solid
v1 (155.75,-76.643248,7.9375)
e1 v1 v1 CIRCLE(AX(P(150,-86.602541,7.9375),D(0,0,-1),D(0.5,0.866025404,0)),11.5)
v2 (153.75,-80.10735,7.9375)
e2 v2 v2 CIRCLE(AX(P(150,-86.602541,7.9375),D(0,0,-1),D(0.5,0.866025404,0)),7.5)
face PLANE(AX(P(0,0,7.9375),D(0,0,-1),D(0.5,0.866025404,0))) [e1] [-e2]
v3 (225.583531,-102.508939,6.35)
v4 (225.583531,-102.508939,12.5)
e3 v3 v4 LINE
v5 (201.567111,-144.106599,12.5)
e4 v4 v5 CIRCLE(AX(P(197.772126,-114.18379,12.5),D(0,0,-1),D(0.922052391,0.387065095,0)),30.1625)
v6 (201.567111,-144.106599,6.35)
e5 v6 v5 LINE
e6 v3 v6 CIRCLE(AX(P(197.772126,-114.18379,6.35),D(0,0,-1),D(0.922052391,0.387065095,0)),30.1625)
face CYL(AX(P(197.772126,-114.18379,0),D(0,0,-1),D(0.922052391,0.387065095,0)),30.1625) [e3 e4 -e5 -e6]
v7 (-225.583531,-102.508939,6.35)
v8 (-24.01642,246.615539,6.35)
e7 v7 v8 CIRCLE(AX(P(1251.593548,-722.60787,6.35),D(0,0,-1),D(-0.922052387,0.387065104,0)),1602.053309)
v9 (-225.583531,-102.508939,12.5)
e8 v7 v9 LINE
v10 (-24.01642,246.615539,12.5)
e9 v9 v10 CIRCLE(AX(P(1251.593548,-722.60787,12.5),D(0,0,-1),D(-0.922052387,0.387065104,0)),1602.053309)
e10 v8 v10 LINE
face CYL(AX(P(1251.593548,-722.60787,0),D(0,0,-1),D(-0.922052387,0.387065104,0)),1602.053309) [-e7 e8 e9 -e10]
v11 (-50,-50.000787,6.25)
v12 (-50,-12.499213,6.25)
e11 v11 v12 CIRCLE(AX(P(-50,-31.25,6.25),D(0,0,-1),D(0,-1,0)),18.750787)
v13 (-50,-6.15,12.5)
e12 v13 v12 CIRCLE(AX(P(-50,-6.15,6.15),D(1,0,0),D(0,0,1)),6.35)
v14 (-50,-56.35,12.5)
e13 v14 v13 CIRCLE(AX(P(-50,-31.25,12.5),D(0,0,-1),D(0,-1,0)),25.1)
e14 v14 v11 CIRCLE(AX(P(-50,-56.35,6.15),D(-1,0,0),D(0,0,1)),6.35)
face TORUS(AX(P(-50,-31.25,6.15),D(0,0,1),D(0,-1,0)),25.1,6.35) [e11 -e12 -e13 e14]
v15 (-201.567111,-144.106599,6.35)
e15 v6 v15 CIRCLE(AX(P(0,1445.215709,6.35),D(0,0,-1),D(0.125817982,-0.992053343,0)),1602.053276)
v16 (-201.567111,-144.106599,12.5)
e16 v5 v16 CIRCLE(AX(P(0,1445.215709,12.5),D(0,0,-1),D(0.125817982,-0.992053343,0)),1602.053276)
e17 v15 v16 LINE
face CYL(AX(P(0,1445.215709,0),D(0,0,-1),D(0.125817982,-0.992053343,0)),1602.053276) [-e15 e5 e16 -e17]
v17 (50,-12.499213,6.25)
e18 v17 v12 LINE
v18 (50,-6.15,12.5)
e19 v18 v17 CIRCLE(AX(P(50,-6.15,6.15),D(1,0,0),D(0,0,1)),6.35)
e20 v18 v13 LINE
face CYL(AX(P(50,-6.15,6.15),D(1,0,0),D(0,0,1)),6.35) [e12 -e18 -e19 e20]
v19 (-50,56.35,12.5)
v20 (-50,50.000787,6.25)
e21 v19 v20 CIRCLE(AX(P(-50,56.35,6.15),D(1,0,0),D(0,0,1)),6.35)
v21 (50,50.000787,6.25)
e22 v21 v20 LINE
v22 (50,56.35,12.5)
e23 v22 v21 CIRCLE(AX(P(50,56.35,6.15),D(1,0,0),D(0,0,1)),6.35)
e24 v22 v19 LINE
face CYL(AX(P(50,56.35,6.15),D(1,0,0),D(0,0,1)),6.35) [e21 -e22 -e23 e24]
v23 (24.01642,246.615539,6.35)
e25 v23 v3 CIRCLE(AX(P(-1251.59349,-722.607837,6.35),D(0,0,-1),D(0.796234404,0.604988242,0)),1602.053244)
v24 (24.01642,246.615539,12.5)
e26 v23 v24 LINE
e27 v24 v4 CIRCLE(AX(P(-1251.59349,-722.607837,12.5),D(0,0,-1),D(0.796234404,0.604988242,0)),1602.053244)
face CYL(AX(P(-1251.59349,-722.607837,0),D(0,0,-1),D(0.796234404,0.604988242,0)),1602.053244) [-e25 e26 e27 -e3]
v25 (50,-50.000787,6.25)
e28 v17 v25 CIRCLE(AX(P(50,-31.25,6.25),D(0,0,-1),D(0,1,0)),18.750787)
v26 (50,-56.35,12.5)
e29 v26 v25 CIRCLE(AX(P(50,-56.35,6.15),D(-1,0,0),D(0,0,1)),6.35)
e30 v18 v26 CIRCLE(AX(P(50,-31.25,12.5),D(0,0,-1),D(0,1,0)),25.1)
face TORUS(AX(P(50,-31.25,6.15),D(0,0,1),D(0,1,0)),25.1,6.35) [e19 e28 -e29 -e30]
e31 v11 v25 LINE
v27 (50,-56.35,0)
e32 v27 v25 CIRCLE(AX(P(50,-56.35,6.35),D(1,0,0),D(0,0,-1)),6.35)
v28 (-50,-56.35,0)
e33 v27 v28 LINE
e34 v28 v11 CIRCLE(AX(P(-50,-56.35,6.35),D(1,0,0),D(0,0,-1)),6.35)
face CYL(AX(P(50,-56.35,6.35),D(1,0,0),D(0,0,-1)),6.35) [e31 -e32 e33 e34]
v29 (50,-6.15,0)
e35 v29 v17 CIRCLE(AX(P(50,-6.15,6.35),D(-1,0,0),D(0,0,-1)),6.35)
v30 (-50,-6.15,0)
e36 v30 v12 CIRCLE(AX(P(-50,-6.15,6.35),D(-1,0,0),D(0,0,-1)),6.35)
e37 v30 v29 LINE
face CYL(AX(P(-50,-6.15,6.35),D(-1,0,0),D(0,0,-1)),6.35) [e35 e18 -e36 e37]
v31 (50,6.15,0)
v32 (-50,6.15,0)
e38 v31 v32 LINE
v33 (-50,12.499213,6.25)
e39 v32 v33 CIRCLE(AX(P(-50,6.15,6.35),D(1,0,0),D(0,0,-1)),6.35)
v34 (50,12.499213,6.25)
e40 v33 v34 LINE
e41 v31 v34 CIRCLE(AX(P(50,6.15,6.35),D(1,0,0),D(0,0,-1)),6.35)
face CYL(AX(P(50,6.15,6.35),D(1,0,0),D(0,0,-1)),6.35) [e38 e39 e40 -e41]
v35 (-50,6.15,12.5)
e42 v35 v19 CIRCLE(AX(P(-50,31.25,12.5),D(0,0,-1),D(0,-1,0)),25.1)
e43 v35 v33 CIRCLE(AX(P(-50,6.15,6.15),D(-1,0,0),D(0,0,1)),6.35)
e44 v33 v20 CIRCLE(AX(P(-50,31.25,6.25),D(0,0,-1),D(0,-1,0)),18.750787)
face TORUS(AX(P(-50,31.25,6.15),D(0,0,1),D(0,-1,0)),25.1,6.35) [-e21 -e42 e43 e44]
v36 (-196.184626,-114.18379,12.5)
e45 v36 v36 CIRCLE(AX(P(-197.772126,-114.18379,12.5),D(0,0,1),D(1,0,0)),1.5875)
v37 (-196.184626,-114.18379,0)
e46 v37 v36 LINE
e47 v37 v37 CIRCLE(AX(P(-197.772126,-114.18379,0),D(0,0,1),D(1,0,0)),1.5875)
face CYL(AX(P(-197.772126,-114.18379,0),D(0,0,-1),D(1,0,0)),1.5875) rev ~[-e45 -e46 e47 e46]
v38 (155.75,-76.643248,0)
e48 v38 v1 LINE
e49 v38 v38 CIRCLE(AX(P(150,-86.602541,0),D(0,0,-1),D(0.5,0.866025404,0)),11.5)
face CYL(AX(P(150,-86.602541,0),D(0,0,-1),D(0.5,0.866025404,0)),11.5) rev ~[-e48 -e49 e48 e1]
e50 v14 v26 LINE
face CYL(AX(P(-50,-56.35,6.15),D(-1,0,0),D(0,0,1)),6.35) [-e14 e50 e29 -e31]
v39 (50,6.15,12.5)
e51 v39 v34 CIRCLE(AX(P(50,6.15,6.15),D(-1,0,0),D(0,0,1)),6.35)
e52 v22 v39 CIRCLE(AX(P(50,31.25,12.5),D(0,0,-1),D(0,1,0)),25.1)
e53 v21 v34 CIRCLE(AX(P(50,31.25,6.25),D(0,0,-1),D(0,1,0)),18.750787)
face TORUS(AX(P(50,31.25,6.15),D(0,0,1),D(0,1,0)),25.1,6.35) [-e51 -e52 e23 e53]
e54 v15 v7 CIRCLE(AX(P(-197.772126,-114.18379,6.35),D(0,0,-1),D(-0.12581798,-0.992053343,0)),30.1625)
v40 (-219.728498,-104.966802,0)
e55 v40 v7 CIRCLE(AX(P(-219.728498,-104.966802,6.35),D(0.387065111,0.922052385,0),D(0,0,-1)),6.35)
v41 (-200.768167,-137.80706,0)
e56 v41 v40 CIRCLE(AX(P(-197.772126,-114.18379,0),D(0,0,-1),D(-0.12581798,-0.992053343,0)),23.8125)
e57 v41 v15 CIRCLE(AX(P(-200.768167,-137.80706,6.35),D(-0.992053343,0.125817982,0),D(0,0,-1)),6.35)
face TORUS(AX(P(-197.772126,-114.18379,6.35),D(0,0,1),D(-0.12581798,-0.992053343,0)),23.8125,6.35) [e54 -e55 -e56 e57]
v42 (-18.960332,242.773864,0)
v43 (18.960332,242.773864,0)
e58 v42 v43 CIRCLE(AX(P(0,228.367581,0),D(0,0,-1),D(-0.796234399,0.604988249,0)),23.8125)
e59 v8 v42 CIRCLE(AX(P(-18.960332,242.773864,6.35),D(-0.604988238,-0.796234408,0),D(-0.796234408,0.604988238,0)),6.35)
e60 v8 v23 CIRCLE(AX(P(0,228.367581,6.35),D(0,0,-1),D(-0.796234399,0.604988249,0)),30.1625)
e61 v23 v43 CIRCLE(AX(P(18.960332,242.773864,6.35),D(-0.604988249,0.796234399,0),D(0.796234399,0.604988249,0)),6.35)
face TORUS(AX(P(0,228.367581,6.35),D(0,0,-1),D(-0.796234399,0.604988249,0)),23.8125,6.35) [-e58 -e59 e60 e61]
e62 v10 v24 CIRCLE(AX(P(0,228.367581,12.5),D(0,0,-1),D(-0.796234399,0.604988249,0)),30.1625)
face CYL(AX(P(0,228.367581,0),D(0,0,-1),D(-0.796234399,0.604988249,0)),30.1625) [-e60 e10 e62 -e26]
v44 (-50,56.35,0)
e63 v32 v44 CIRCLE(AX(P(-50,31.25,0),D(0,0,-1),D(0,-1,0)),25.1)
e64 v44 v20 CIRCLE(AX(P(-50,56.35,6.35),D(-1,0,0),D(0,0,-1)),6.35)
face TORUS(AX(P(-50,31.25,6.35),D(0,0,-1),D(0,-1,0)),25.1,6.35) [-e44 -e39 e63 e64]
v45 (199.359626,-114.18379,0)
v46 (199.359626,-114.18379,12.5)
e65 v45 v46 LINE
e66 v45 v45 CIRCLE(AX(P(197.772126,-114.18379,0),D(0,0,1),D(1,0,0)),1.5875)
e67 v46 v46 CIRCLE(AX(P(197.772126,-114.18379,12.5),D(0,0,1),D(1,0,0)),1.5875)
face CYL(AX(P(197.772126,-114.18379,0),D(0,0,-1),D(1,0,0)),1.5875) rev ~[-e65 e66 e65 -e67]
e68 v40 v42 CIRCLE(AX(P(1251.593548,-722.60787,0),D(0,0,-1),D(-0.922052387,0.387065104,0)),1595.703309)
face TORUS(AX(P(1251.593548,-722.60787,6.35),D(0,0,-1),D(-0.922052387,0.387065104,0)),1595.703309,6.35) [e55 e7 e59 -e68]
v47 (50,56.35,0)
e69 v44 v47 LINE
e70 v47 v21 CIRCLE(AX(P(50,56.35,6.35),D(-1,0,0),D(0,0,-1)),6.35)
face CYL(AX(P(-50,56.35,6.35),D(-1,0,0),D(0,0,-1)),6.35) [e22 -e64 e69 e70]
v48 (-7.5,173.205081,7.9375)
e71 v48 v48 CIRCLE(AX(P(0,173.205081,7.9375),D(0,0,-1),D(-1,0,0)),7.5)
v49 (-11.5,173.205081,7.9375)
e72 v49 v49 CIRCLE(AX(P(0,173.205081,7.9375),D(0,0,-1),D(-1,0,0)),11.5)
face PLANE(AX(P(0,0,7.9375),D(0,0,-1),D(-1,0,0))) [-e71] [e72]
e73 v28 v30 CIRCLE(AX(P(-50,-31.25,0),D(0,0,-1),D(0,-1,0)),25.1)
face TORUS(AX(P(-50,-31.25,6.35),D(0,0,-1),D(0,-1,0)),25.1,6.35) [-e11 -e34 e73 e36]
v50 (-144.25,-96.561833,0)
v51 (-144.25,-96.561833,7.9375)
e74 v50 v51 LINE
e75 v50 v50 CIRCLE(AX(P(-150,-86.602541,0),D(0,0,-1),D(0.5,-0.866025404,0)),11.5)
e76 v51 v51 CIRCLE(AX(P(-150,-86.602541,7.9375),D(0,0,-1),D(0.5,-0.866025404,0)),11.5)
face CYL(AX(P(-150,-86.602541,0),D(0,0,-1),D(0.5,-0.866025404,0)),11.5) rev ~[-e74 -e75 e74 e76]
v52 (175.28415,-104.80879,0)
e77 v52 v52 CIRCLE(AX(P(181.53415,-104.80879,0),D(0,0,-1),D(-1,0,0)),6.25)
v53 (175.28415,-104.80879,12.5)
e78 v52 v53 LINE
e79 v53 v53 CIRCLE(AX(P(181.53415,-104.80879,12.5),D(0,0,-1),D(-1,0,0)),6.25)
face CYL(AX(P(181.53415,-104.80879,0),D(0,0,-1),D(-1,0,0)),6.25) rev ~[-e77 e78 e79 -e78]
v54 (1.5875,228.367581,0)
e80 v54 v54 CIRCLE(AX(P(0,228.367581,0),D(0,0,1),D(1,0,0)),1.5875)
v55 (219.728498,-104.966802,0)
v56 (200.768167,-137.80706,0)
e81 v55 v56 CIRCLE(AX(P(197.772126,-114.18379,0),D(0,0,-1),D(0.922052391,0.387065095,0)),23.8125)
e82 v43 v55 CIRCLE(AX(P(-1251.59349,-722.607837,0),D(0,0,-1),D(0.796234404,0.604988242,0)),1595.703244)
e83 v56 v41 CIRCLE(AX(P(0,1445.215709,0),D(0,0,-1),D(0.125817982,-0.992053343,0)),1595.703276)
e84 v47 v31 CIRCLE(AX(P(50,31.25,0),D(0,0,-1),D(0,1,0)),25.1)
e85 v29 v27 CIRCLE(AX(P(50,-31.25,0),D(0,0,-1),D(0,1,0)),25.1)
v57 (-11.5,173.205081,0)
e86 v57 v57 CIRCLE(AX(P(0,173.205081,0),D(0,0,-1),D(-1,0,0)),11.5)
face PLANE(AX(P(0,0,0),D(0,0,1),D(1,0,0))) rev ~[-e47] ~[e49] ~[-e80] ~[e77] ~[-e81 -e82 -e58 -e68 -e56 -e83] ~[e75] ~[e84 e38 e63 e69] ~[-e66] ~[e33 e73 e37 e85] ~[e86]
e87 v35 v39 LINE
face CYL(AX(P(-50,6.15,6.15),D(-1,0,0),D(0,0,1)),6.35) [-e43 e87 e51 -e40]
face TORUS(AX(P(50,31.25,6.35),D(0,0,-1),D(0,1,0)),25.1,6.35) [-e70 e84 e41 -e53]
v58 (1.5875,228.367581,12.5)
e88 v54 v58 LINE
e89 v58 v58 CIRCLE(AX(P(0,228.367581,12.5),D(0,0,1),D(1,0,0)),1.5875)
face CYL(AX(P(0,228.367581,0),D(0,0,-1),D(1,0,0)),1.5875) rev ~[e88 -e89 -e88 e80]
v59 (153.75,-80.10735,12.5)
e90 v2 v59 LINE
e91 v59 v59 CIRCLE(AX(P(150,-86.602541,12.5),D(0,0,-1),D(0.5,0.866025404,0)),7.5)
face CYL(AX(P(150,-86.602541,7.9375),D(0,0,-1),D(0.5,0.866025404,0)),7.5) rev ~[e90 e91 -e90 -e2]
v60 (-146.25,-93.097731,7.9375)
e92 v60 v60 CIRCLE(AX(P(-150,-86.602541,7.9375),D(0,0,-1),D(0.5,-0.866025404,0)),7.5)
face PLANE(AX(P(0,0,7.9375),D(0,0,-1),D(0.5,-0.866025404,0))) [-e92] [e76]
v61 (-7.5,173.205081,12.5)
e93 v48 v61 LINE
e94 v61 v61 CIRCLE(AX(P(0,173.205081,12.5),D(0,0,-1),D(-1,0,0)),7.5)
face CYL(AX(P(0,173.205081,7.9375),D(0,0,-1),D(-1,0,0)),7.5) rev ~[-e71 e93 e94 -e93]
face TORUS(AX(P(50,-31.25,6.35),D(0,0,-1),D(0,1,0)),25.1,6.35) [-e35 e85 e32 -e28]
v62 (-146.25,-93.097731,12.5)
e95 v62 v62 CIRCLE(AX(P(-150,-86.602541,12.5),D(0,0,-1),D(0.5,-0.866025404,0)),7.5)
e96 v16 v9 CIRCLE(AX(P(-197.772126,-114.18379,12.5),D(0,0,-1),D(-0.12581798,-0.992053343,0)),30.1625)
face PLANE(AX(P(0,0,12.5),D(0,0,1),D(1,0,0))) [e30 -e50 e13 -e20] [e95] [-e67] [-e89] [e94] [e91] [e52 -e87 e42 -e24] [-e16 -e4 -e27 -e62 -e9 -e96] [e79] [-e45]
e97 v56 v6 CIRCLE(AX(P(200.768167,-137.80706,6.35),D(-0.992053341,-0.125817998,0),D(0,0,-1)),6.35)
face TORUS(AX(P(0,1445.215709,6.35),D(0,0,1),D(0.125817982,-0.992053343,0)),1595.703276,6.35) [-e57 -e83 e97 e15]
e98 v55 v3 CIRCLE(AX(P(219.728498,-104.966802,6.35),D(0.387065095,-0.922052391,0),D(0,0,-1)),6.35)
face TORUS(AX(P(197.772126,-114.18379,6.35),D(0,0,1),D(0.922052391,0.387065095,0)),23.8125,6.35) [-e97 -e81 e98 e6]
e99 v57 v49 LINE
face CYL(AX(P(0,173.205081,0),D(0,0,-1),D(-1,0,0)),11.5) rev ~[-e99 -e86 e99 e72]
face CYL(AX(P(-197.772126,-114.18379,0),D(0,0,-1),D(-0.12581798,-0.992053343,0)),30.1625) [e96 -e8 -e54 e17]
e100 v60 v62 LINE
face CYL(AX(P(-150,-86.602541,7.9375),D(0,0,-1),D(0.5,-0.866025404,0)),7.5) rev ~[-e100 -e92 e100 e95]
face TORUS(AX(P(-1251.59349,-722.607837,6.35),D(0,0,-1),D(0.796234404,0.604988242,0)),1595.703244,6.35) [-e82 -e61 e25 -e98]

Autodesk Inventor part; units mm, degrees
ref_plane "YZ Plane" through (0, 0, 0) normal (1, 0, 0) x (0, 1, 0)
ref_plane "XZ Plane" through (0, 0, 0) normal (0, 1, 0) x (-1, 0, 0)
ref_plane "XY Plane" through (0, 0, 0) normal (0, 0, 1) x (1, 0, 0)
sketch "Sketch1" plane through (0, 0, 0) normal (0, 0, 1) x (1, 0, 0)
  line L0 (0, -144.337567) -> (-125, 72.168784) construction
  line L1 (-125, 72.168784) -> (125, 72.168784) construction
  line L2 (125, 72.168784) -> (0, -144.337567) construction
  line L3 (0, 173.205081) -> (150, -86.60254) construction
  line L4 (150, -86.60254) -> (-150, -86.60254) construction
  line L5 (-150, -86.60254) -> (0, 173.205081) construction
  circle A0 centre (-150, -86.60254) radius 1.5875
  circle A1 centre (150, -86.60254) radius 1.5875
  circle A2 centre (0, 173.205081) radius 1.5875
  circle A3 centre (-125, 72.168784) radius 4.25
  circle A4 centre (125, 72.168784) radius 4.25
  circle A5 centre (0, -144.337567) radius 4.25
  circle A6 centre (-150, -86.60254) radius 25 construction
  line L6 (-250.015109, -144.34629) -> (0, 288.692581) construction
  line L7 (0, 288.692581) -> (250.015109, -144.34629) construction
  line L8 (250.015109, -144.34629) -> (-250.015109, -144.34629) construction
  arc A7 (-225.583531, -102.508939) -> (-201.567111, -144.106599) centre (-197.772126, -114.18379) ccw
  circle A8 centre (-125, 72.168784) radius 12.5 construction
  arc A9 (24.01642, 246.615539) -> (-24.01642, 246.615539) centre (0, 228.367581) ccw
  arc A10 (201.567111, -144.106599) -> (225.583531, -102.508939) centre (197.772126, -114.18379) ccw
  arc A11 (-24.01642, 246.615539) -> (-225.583531, -102.508939) centre (1251.593518, -722.607855) ccw
  arc A12 (225.583531, -102.508939) -> (24.01642, 246.615539) centre (-1251.593518, -722.607855) ccw
  arc A13 (-201.567111, -144.106599) -> (201.567111, -144.106599) centre (0, 1445.215709) ccw
  circle A14 centre (0, 228.367581) radius 1.5875
  circle A15 centre (-197.772126, -114.18379) radius 1.5875
  circle A16 centre (197.772126, -114.18379) radius 1.5875
  point P0 (0, 0)
  point P1 (0, 0)
  point P2 (0, 0)
  point P3 (0, 0)
  dimension "d0" = 300
  dimension "d1" = 250
  dimension "d2" = 3.175
  dimension "d3" = 8.5
  dimension "d4" = 50
  dimension "d5" = 60.325
  dimension "d6" = 25
  dimension "d9" = 3.175
sketch "Sketch1 outline for Extrusion2" plane through (0, 0, 0) normal (0, 0, 1) x (1, 0, 0)
  arc A0 (-24.01642, 246.615539) -> (24.01642, 246.615539) centre (0, 228.367581) cw
  arc A1 (-225.583531, -102.508939) -> (-24.01642, 246.615539) centre (1251.593518, -722.607855) cw
  arc A2 (24.01642, 246.615539) -> (225.583531, -102.508939) centre (-1251.593518, -722.607855) cw
  arc A3 (-201.567111, -144.106599) -> (-225.583531, -102.508939) centre (-197.772126, -114.18379) cw
  arc A4 (225.583531, -102.508939) -> (201.567111, -144.106599) centre (197.772126, -114.18379) cw
  arc A5 (201.567111, -144.106599) -> (-201.567111, -144.106599) centre (0, 1445.215709) cw
  circle A6 centre (-197.772126, -114.18379) radius 1.5875
  circle A7 centre (-150, -86.60254) radius 1.5875
  circle A8 centre (197.772126, -114.18379) radius 1.5875
  circle A9 centre (150, -86.60254) radius 1.5875
  circle A10 centre (0, 228.367581) radius 1.5875
  circle A11 centre (0, 173.205081) radius 1.5875
extrude "Extrusion2" add sketch "Sketch1 outline for Extrusion2" along normal blind 12.5
sketch "Sketch8" plane through (0, 0, 0) normal (0, 0, -1) x (-1, 0, 0)
  circle A0 centre (0, 173.205081) radius 1.5875
  circle A1 centre (0, 173.205081) radius 11.5
  point P0 (0, 0)
  dimension "d34" = 23
sketch "Sketch8 outline for Extrusion9" plane through (0, 0, 0) normal (0, 0, -1) x (-1, 0, 0)
  circle A0 centre (0, 173.205081) radius 11.5
  circle A1 centre (0, 173.205081) radius 1.5875
extrude "Extrusion9" cut sketch "Sketch8 outline for Extrusion9" against normal blind 7.9375
sketch "Sketch9" plane through (0, 173.205081, 7.9375) normal (0, 0, -1) x (-1, 0, 0)
  circle A0 centre (0, 0) radius 1.5875 projected
  circle A1 centre (0, 0) radius 11.5 projected
  circle A2 centre (0, 0) radius 7.5
  point P0 (0, -173.205081)
  dimension "d39" = 15
sketch "Sketch9 outline for Extrusion10" plane through (0, 173.205081, 7.9375) normal (0, 0, -1) x (-1, 0, 0)
  circle A0 centre (0, 0) radius 7.5
  circle A1 centre (0, 0) radius 1.5875
extrude "Extrusion10" cut sketch "Sketch9 outline for Extrusion10" against normal through all
pattern_circular "Circular Pattern1" count 3 over 360 about axis through (0, 0, -10) along (0, 0, 1) of "Extrusion9", "Extrusion10"
sketch "Sketch10" plane through (0, 0, 0) normal (0, 0, -1) x (-1, 0, 0)
  line L0 (-50, 12.5) -> (50, 12.5)
  arc A0 (50, 12.5) -> (50, 50) centre (50, 31.25) ccw
  line L1 (50, 50) -> (-50, 50)
  arc A1 (-50, 50) -> (-50, 12.5) centre (-50, 31.25) ccw
  line L2 (-50, -12.5) -> (50, -12.5)
  arc A2 (50, -50) -> (50, -12.5) centre (50, -31.25) ccw
  line L3 (50, -50) -> (-50, -50)
  arc A3 (-50, -12.5) -> (-50, -50) centre (-50, -31.25) ccw
  line L4 (0, 0) -> (0, -12.5)
  line L5 (0, 0) -> (0, 12.5)
  dimension "d46" = 25
  dimension "d48" = 100
  dimension "d49" = 18.75
sketch "Sketch10 outline for Extrusion11" plane through (0, 0, 0) normal (0, 0, -1) x (-1, 0, 0)
  line L0 (50, -12.5) -> (-50, -12.5)
  arc A0 (-50, -12.5) -> (-50, -50) centre (-50, -31.25) ccw
  line L1 (-50, -50) -> (50, -50)
  arc A1 (50, -50) -> (50, -12.5) centre (50, -31.25) ccw
  line L2 (-50, 12.5) -> (50, 12.5)
  arc A2 (50, 12.5) -> (50, 50) centre (50, 31.25) ccw
  line L3 (50, 50) -> (-50, 50)
  arc A3 (-50, 50) -> (-50, 12.5) centre (-50, 31.25) ccw
extrude "Extrusion11" cut sketch "Sketch10 outline for Extrusion11" against normal through all
sketch "Sketch11" plane through (0, 0, 0) normal (0, 0, -1) x (-1, 0, 0)
  circle A0 centre (-150, -86.60254) radius 11.5
  arc A1 (-225.583531, -102.508939) -> (-201.567111, -144.106599) centre (-197.772126, -114.18379) ccw
  circle A2 centre (-197.772126, -114.18379) radius 12.5
  circle A3 centre (-197.772126, -114.18379) radius 25
  circle A4 centre (-181.53415, -104.80879) radius 6.25
  line L0 (-197.772126, -114.18379) -> (-181.53415, -104.80879)
  line L1 (-150, -86.60254) -> (-181.53415, -104.80879)
  point P0 (0, 0)
  dimension "d52" = 25
  dimension "d54" = 50
sketch "Sketch11 outline for Extrusion12" plane through (0, 0, 0) normal (0, 0, -1) x (-1, 0, 0)
  circle A0 centre (-181.53415, -104.80879) radius 6.25
extrude "Extrusion12" cut sketch "Sketch11 outline for Extrusion12" against normal through all
fillet "Fillet2" radius 6.35 22 edges at (-68.75, 31.25, 0) (0, 12.5, 0) (68.75, 31.25, 0) (0, 50, 0) (68.75, 31.25, 12.5) (0, 12.5, 12.5) (-68.75, 31.25, 12.5) (0, 50, 12.5) (-68.75, -31.25, 0) (0, -50, 0) (68.75, -31.25, 0) (0, -12.5, 0) (68.75, -31.25, 12.5) (0, -50, 12.5) (-68.75, -31.25, 12.5) (0, -12.5, 12.5) (223.8936, -129.265, 0) (0, -156.8376, 0) (-223.8936, -129.265, 0) (-135.8253, 78.4188, 0) (0, 258.5301, 0) (135.8253, 78.4188, 0)
properties part number "TOP PLATE"
